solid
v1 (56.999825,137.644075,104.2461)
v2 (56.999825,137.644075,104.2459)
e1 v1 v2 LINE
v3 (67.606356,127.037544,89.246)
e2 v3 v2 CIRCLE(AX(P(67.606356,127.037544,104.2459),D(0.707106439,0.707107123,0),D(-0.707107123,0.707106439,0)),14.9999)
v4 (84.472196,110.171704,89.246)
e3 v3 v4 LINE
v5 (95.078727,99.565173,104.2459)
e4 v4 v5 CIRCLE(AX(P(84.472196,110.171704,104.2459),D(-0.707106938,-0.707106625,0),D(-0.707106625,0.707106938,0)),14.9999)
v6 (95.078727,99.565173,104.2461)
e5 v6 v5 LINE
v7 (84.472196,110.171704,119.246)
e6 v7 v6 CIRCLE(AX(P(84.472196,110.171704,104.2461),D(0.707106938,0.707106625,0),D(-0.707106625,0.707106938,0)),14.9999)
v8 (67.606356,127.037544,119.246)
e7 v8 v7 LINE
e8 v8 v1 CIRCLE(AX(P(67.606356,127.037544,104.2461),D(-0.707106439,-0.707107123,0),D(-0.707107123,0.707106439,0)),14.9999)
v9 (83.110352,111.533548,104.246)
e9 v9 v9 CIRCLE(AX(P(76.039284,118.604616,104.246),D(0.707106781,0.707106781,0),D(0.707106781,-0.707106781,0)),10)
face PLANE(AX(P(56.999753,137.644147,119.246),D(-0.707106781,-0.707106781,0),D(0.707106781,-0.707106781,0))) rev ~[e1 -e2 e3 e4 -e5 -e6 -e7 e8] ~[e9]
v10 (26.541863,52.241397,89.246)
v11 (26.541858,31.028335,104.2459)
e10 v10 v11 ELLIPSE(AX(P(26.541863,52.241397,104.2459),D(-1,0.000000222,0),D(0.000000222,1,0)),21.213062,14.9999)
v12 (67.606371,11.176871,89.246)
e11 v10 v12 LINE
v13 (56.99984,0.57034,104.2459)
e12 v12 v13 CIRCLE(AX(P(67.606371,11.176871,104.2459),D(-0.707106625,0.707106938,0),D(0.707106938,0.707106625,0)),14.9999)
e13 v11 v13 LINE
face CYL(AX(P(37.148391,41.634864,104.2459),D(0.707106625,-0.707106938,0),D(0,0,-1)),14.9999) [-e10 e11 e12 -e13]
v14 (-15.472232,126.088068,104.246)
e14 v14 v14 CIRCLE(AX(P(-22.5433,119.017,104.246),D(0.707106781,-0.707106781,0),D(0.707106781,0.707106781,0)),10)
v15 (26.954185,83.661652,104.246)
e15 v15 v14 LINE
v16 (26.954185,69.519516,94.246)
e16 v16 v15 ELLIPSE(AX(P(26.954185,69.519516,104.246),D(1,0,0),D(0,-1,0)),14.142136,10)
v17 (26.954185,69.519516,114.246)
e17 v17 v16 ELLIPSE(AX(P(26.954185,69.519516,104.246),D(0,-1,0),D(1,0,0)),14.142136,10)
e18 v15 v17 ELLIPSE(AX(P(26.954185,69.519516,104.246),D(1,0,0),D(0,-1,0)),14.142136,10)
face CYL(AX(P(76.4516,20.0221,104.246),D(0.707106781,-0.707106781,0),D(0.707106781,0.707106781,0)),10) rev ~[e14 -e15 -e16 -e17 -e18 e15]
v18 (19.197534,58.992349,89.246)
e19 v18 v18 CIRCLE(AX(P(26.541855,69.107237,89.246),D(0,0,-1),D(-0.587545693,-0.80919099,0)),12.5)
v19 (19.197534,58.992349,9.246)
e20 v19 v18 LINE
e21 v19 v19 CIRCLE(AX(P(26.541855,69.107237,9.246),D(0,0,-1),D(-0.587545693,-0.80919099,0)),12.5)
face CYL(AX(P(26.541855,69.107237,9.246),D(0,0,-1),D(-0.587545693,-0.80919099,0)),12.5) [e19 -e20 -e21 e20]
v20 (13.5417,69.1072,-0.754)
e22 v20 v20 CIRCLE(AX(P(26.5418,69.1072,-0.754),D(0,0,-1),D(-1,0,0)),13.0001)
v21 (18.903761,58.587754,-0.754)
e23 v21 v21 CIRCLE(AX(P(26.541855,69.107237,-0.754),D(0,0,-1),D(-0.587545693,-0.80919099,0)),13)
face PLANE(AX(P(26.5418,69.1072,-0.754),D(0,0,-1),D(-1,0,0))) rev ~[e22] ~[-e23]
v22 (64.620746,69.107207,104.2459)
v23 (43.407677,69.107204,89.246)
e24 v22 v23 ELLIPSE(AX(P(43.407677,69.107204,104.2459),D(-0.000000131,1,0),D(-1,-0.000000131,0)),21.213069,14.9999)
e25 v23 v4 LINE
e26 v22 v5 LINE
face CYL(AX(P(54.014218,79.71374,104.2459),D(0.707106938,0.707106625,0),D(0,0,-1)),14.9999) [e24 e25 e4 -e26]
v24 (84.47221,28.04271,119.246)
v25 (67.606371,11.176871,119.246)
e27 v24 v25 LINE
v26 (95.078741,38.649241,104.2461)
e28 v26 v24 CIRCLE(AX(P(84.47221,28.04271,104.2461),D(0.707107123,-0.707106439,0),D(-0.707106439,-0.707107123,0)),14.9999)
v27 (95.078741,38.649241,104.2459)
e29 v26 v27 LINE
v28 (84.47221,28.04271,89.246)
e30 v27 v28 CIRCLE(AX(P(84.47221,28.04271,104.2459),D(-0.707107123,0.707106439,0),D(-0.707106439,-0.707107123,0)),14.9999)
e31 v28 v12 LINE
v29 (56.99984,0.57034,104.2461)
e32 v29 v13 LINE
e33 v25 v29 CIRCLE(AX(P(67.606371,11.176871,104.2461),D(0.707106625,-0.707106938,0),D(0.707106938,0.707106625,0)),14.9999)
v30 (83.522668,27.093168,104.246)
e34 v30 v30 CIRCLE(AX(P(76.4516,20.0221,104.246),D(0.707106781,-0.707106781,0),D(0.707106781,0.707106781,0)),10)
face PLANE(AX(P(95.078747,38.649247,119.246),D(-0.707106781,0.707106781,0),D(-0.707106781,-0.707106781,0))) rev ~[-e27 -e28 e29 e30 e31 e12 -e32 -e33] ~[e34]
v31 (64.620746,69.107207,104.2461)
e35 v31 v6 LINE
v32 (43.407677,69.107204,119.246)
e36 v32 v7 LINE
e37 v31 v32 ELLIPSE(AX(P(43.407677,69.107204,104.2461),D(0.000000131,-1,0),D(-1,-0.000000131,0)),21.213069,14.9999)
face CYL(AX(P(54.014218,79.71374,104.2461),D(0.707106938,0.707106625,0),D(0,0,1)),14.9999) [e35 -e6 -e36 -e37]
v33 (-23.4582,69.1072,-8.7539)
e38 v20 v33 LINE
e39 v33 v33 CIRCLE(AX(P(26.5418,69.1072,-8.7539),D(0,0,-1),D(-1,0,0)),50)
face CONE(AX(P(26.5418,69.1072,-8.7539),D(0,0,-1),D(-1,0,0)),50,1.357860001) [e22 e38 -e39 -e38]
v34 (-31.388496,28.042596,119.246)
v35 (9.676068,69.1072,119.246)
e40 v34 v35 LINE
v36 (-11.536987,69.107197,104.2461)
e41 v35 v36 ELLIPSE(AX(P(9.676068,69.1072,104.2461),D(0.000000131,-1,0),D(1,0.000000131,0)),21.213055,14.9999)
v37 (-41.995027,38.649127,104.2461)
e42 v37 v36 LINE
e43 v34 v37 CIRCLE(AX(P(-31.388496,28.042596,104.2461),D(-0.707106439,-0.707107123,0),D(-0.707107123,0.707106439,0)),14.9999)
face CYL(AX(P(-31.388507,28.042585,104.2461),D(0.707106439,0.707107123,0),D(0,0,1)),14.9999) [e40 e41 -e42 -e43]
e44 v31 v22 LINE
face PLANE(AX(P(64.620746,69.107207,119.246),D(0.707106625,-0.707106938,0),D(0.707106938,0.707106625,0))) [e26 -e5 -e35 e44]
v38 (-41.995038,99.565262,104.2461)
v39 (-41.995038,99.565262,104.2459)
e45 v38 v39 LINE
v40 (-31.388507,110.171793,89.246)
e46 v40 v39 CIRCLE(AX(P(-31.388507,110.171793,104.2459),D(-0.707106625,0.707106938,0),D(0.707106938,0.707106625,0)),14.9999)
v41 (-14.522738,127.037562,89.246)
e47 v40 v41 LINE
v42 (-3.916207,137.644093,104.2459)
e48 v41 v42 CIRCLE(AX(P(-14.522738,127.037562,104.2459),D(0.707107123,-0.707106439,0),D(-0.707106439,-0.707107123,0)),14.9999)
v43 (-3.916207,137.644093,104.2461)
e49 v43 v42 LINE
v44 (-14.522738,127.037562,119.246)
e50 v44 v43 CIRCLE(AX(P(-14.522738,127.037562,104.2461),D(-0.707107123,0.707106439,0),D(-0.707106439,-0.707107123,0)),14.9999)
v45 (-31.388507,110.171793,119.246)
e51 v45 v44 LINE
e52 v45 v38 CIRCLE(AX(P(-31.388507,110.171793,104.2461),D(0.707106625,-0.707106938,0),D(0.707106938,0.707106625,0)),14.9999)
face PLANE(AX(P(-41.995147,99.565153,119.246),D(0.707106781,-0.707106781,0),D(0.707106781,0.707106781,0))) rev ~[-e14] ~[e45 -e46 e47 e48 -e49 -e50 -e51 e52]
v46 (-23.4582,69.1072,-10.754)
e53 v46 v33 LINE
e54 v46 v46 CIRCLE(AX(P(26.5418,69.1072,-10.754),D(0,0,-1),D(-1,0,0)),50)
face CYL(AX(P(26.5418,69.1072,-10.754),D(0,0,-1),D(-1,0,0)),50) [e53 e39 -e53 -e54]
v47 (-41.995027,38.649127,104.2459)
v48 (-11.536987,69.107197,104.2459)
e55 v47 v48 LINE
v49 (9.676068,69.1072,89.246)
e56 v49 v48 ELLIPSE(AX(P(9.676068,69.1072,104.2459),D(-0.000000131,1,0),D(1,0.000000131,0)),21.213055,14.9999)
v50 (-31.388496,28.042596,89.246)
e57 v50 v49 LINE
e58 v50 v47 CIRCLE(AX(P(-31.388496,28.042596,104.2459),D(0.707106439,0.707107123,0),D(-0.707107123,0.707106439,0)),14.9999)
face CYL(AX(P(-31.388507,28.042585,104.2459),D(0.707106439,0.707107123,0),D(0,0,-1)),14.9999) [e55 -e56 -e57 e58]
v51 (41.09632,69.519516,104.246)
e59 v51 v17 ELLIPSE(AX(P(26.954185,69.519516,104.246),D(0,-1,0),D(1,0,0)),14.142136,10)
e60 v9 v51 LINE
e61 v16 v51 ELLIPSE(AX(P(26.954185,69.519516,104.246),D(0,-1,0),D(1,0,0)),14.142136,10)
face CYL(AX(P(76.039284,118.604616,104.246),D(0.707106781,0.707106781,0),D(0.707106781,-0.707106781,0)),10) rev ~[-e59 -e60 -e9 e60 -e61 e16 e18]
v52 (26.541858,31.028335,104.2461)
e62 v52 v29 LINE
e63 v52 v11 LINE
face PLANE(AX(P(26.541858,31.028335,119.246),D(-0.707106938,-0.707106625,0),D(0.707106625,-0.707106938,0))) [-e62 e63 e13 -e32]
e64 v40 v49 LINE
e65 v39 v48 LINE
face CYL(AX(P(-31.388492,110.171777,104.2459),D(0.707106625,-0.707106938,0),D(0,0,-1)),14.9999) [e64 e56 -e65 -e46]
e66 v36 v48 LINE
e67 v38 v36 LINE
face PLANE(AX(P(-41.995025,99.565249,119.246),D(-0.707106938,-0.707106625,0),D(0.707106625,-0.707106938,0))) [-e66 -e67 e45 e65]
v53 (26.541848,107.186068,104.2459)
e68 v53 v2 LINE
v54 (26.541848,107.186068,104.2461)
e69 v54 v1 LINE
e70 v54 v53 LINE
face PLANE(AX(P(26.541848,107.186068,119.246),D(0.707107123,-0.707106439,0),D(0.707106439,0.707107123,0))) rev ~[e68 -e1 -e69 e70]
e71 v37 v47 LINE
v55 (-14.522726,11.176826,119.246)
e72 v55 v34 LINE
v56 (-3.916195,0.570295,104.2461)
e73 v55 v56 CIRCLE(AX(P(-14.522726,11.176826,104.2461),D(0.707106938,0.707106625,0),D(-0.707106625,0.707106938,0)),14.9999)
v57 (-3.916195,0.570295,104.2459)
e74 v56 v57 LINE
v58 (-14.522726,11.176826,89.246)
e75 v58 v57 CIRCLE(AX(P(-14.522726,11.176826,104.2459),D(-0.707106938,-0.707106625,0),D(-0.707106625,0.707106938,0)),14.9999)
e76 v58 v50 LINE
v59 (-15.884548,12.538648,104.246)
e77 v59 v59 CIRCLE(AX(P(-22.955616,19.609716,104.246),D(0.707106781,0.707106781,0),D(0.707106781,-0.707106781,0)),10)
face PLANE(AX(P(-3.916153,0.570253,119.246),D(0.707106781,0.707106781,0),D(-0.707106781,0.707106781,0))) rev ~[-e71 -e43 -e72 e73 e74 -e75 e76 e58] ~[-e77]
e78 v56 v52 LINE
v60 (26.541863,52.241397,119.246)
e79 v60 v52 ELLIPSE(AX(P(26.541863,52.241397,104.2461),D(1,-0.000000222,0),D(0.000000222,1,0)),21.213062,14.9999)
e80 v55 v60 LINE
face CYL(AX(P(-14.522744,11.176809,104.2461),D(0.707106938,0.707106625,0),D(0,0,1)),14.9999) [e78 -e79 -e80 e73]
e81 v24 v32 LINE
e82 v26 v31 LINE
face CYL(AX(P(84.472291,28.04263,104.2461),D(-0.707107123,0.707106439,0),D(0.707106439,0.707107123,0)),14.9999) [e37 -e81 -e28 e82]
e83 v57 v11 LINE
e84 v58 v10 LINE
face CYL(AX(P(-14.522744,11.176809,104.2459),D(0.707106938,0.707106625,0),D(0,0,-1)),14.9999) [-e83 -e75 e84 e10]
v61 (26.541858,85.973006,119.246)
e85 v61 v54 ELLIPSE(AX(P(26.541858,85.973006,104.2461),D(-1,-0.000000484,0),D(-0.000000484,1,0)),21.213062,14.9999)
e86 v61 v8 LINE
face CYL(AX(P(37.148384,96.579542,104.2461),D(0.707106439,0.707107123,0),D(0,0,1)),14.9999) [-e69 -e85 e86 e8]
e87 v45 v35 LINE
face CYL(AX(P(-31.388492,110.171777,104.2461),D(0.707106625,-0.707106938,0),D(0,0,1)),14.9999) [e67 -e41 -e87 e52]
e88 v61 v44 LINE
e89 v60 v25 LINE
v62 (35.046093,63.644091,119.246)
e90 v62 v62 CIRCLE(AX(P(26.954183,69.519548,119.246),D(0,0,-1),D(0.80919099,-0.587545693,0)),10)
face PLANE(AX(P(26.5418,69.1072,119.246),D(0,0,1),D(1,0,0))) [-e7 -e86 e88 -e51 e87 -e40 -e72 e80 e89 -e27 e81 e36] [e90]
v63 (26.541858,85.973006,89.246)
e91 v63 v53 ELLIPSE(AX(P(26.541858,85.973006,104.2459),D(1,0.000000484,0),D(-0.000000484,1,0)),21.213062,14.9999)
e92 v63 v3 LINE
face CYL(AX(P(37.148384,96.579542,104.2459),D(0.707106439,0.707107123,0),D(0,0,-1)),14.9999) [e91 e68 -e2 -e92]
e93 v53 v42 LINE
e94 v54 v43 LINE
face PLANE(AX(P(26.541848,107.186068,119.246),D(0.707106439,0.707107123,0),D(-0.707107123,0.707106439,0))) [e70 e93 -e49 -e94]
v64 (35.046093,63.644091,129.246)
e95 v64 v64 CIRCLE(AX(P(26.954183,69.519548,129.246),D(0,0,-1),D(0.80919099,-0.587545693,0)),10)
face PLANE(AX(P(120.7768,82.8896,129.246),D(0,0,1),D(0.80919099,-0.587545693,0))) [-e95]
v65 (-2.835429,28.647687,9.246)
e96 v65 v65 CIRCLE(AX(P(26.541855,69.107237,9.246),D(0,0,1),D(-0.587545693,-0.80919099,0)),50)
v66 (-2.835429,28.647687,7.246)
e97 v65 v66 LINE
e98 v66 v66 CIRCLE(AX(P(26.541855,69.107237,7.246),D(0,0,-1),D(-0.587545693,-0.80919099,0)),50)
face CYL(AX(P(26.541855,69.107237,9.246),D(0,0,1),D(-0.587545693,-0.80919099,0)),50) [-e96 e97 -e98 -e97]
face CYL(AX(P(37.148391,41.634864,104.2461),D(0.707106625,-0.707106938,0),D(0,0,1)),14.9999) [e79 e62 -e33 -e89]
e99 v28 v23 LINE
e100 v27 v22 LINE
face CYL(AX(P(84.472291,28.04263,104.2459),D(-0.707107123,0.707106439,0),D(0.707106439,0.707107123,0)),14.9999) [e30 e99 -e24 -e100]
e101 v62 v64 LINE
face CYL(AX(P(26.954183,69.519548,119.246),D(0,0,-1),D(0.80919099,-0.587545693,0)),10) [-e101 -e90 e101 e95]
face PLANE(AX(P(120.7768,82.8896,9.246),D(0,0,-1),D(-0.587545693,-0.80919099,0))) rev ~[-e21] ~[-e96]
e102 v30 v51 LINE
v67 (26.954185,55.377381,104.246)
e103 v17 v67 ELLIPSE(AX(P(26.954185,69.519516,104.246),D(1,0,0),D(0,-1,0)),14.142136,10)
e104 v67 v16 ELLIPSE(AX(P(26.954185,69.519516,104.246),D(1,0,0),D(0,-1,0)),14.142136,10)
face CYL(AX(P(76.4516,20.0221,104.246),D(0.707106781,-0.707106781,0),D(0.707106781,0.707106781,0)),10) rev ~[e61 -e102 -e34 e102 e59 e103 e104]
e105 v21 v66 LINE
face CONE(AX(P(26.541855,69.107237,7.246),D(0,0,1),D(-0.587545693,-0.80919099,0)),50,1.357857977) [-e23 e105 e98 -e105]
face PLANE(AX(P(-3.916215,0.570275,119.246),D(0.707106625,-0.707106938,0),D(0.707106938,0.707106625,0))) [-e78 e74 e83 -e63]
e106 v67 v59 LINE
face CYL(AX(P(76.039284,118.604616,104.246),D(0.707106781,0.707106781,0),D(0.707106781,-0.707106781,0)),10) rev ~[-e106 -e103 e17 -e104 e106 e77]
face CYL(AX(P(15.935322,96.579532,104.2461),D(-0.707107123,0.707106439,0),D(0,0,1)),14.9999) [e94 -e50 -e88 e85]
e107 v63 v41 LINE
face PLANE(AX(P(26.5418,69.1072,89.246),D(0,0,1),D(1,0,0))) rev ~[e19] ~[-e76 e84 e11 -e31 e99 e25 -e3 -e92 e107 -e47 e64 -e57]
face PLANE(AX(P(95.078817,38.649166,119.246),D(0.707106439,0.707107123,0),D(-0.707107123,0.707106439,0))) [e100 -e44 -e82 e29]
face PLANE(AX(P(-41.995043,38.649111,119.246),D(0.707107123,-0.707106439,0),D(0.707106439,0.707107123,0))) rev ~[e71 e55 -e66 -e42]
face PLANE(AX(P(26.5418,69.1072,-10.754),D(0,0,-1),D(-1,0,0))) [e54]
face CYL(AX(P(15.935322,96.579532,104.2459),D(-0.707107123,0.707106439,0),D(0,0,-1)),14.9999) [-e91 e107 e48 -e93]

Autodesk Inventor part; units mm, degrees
ref_plane "YZ Plane" through (0, 0, 0) normal (1, 0, 0) x (0, 1, 0)
ref_plane "XZ Plane" through (0, 0, 0) normal (0, 1, 0) x (-1, 0, 0)
ref_plane "XY Plane" through (0, 0, 0) normal (0, 0, 1) x (1, 0, 0)
ref_plane "Płaszczyzna konstrukcyjna1" through (120.7768, 82.8896, 9.246) normal (0, 0, -1) x (-0.5875457, -0.809191, 0)
sketch "Szkic1" plane through (120.7768, 82.8896, 9.246) normal (0, 0, -1) x (-0.5875457, -0.809191, 0)
  circle A0 centre (18.3881, 39.1184) radius 12.5
  circle A1 centre (66.5199, 68.1563) radius 12.5 projected
  point P0 (138.0354, 49.03)
  dimension "d0" = 25
extrude "Wyciągnięcie proste1" add sketch "Szkic1" along normal blind 20 and the other way blind 110 contours A1
sketch "Szkic2" plane through (120.7768, 82.8896, 9.246) normal (0, 0, -1) x (-0.5875457, -0.809191, 0)
  circle A0 centre (66.5199, 68.1563) radius 12.5 projected
  circle A1 centre (66.5199, 68.1563) radius 50
  point P0 (138.0354, 49.03)
  dimension "d5" = 100
extrude "Wyciągnięcie proste2" add sketch "Szkic2" along normal blind 10
chamfer "Faza1" distance 37 distance2 8 1 edges at (55.9191, 109.5667, -0.754) measured on face at (42.4117, 35.3342, -0.754)
sketch "Szkic3" plane through (26.5418, 69.1072, -10.754) normal (0, 0, -1) x (-1, 0, 0)
  circle A0 centre (0, 0) radius 50
  point P0 (26.5418, -69.1072)
  dimension "d11" = 100
extrude "Wyciągnięcie proste3" add sketch "Szkic3" against normal blind 10
chamfer "Faza2" distance 37 distance2 8 1 edges at (76.5418, 69.1072, -0.754) measured on face at (63.7859, 73.295, -0.754)
sketch "Szkic4" plane through (26.5418, 69.1072, 119.246) normal (0, 0, 1) x (1, 0, 0)
  circle A0 centre (0, 0) radius 75
  point P0 (-26.5418, -69.1072)
  dimension "d17" = 150
extrude "Wyciągnięcie proste4" add sketch "Szkic4" against normal blind 30
sketch "Szkic5" plane through (26.5418, 69.1072, 119.246) normal (0, 0, 1) x (1, 0, 0)
  line L0 (0, 98.9949) -> (98.9949, 0)
  line L1 (98.9949, 0) -> (0, -98.9949)
  line L2 (0, -98.9949) -> (-98.9949, 0)
  line L3 (-98.9949, 0) -> (0, 98.9949)
  line L4 (0, 98.9949) -> (0, -98.9949) construction
  line L5 (98.9949, 0) -> (-98.9949, 0) construction
  line L6 (0, 98.9949) -> (140, 98.9949) construction
  circle A0 centre (0, 0) radius 12.5 projected
  circle A1 centre (0, 0) radius 75
  point P0 (-26.5418, -69.1072)
  point P1 (-68.5369, -30.458)
  point P2 (-30.458, -68.5369)
  point P3 (-30.458, 68.5369)
  point P4 (-68.5369, 30.458)
  point P5 (68.5369, 30.458)
  point P6 (30.458, 68.5369)
  point P7 (30.458, -68.5369)
  point P8 (68.5369, -30.458)
  dimension "d20" = 140
  dimension "d21" = 45
  dimension "d22" = 140
  dimension "d23" = 150
extrude "Wyciągnięcie proste5" cut sketch "Szkic5" against normal blind 30 contours A1 L0 | L3 A1 | L2 A1 | A1 L1
sketch "Szkic6" plane through (56.9998, 0.5703, 89.246) normal (0.7071068, -0.7071068, 0) x (0.7071068, 0.7071068, 0)
  circle A0 centre (27.509, 15) radius 10
  point P0 (-40.7082, -89.246)
  dimension "d26" = 20
extrude "Wyciągnięcie proste6" cut sketch "Szkic6" against normal through all
sketch "Szkic7" plane through (95.0787, 99.5652, 119.246) normal (0.7071068, 0.7071068, 0) x (0.7071068, -0.7071068, 0)
  line L0 (0, 0) -> (-53.8516, 0) projected
  line L1 (0, 30) -> (0, 0) projected
  line L2 (-53.8516, 30) -> (0, 30) projected
  line L3 (-53.8516, 0) -> (-53.8516, 30) projected
  circle A0 centre (-26.9258, 15) radius 10
  point P0 (3.1724, 119.246)
  dimension "d29" = 20
extrude "Wyciągnięcie proste7" cut sketch "Szkic7" against normal through all contours A0
sketch "Szkic8" plane through (120.7768, 82.8896, 119.246) normal (0, 0, 1) x (0.809191, -0.5875457, 0)
  line L0 (-133.0712, -28.956) -> (-141.5112, -82.1421) projected
  arc A0 (-141.5112, -82.1421) -> (-105.7202, -131.4349) centre (-68.1563, -66.5199) ccw projected
  line L1 (-105.7202, -131.4349) -> (-52.5341, -139.8749) projected
  arc A1 (-52.5341, -139.8749) -> (-3.2413, -104.0839) centre (-68.1563, -66.5199) ccw projected
  line L2 (-3.2413, -104.0839) -> (5.1987, -50.8977) projected
  arc A2 (5.1987, -50.8977) -> (-30.5923, -1.605) centre (-68.1563, -66.5199) ccw projected
  line L3 (-30.5923, -1.605) -> (-83.7785, 6.835) projected
  arc A3 (-83.7785, 6.835) -> (-133.0712, -28.956) centre (-68.1563, -66.5199) ccw projected
  arc A4 (-83.7785, 6.835) -> (-133.0712, -28.956) centre (-68.1563, -66.5199) ccw projected
  line L4 (-105.7202, -131.4349) -> (-83.7785, 6.835)
  arc A5 (-52.5341, -139.8749) -> (-3.2413, -104.0839) centre (-68.1563, -66.5199) ccw projected
  line L5 (-52.5341, -139.8749) -> (-30.5923, -1.605)
  arc A6 (5.1987, -50.8977) -> (-30.5923, -1.605) centre (-68.1563, -66.5199) ccw projected
  line L6 (-141.5112, -82.1421) -> (-133.0712, -28.956) projected
  line L7 (-141.5112, -82.1421) -> (-3.2413, -104.0839)
  line L8 (5.1987, -50.8977) -> (-133.0712, -28.956)
  arc A7 (-83.7785, 6.835) -> (-133.0712, -28.956) centre (-68.1563, -66.5199) ccw projected
  point P0 (-49.03, -138.0354)
  point P1 (-90.5293, -35.7069)
  point P2 (-37.3432, -44.1469)
  point P3 (-3.2413, -104.0839)
  point P4 (-45.7832, -97.333)
  point P5 (-98.9693, -88.893)
extrude "Wyciągnięcie proste8" cut sketch "Szkic8" against normal up to surface (110 mm away) contours A3 L4 L8 | L7 L4 A0 | A2 L8 L5 | L5 L7 A1
fillet "Zaokrąglenie1" radius 15 16 edges at (11.3128, 15.7993, 89.246) (11.3128, 15.7993, 119.246) (-26.7661, 53.8781, 119.246) (-26.7661, 53.8781, 89.246) (-26.7661, 84.3362, 119.246) (-26.7661, 84.3362, 89.246) (11.3128, 122.415, 119.246) (11.3128, 122.415, 89.246) (41.7708, 122.415, 89.246) (41.7708, 122.415, 119.246) (41.7708, 15.7993, 119.246) (41.7708, 15.7993, 89.246) (79.8497, 53.8781, 89.246) (79.8497, 53.8781, 119.246) (79.8497, 84.3362, 89.246) (79.8497, 84.3362, 119.246)
sketch "Szkic9" plane through (120.7768, 82.8896, 119.246) normal (0, 0, 1) x (0.809191, -0.5875457, 0)
  line L0 (-79.5086, -74.2531) -> (-68.0649, -65.944) projected
  circle A0 centre (-68.0649, -65.944) radius 10
  point P0 (-49.03, -138.0354)
  dimension "d35" = 20
extrude "Wyciągnięcie proste9" add sketch "Szkic9" along normal blind 10
properties part number "shaft" material "Stal, stopowa"
